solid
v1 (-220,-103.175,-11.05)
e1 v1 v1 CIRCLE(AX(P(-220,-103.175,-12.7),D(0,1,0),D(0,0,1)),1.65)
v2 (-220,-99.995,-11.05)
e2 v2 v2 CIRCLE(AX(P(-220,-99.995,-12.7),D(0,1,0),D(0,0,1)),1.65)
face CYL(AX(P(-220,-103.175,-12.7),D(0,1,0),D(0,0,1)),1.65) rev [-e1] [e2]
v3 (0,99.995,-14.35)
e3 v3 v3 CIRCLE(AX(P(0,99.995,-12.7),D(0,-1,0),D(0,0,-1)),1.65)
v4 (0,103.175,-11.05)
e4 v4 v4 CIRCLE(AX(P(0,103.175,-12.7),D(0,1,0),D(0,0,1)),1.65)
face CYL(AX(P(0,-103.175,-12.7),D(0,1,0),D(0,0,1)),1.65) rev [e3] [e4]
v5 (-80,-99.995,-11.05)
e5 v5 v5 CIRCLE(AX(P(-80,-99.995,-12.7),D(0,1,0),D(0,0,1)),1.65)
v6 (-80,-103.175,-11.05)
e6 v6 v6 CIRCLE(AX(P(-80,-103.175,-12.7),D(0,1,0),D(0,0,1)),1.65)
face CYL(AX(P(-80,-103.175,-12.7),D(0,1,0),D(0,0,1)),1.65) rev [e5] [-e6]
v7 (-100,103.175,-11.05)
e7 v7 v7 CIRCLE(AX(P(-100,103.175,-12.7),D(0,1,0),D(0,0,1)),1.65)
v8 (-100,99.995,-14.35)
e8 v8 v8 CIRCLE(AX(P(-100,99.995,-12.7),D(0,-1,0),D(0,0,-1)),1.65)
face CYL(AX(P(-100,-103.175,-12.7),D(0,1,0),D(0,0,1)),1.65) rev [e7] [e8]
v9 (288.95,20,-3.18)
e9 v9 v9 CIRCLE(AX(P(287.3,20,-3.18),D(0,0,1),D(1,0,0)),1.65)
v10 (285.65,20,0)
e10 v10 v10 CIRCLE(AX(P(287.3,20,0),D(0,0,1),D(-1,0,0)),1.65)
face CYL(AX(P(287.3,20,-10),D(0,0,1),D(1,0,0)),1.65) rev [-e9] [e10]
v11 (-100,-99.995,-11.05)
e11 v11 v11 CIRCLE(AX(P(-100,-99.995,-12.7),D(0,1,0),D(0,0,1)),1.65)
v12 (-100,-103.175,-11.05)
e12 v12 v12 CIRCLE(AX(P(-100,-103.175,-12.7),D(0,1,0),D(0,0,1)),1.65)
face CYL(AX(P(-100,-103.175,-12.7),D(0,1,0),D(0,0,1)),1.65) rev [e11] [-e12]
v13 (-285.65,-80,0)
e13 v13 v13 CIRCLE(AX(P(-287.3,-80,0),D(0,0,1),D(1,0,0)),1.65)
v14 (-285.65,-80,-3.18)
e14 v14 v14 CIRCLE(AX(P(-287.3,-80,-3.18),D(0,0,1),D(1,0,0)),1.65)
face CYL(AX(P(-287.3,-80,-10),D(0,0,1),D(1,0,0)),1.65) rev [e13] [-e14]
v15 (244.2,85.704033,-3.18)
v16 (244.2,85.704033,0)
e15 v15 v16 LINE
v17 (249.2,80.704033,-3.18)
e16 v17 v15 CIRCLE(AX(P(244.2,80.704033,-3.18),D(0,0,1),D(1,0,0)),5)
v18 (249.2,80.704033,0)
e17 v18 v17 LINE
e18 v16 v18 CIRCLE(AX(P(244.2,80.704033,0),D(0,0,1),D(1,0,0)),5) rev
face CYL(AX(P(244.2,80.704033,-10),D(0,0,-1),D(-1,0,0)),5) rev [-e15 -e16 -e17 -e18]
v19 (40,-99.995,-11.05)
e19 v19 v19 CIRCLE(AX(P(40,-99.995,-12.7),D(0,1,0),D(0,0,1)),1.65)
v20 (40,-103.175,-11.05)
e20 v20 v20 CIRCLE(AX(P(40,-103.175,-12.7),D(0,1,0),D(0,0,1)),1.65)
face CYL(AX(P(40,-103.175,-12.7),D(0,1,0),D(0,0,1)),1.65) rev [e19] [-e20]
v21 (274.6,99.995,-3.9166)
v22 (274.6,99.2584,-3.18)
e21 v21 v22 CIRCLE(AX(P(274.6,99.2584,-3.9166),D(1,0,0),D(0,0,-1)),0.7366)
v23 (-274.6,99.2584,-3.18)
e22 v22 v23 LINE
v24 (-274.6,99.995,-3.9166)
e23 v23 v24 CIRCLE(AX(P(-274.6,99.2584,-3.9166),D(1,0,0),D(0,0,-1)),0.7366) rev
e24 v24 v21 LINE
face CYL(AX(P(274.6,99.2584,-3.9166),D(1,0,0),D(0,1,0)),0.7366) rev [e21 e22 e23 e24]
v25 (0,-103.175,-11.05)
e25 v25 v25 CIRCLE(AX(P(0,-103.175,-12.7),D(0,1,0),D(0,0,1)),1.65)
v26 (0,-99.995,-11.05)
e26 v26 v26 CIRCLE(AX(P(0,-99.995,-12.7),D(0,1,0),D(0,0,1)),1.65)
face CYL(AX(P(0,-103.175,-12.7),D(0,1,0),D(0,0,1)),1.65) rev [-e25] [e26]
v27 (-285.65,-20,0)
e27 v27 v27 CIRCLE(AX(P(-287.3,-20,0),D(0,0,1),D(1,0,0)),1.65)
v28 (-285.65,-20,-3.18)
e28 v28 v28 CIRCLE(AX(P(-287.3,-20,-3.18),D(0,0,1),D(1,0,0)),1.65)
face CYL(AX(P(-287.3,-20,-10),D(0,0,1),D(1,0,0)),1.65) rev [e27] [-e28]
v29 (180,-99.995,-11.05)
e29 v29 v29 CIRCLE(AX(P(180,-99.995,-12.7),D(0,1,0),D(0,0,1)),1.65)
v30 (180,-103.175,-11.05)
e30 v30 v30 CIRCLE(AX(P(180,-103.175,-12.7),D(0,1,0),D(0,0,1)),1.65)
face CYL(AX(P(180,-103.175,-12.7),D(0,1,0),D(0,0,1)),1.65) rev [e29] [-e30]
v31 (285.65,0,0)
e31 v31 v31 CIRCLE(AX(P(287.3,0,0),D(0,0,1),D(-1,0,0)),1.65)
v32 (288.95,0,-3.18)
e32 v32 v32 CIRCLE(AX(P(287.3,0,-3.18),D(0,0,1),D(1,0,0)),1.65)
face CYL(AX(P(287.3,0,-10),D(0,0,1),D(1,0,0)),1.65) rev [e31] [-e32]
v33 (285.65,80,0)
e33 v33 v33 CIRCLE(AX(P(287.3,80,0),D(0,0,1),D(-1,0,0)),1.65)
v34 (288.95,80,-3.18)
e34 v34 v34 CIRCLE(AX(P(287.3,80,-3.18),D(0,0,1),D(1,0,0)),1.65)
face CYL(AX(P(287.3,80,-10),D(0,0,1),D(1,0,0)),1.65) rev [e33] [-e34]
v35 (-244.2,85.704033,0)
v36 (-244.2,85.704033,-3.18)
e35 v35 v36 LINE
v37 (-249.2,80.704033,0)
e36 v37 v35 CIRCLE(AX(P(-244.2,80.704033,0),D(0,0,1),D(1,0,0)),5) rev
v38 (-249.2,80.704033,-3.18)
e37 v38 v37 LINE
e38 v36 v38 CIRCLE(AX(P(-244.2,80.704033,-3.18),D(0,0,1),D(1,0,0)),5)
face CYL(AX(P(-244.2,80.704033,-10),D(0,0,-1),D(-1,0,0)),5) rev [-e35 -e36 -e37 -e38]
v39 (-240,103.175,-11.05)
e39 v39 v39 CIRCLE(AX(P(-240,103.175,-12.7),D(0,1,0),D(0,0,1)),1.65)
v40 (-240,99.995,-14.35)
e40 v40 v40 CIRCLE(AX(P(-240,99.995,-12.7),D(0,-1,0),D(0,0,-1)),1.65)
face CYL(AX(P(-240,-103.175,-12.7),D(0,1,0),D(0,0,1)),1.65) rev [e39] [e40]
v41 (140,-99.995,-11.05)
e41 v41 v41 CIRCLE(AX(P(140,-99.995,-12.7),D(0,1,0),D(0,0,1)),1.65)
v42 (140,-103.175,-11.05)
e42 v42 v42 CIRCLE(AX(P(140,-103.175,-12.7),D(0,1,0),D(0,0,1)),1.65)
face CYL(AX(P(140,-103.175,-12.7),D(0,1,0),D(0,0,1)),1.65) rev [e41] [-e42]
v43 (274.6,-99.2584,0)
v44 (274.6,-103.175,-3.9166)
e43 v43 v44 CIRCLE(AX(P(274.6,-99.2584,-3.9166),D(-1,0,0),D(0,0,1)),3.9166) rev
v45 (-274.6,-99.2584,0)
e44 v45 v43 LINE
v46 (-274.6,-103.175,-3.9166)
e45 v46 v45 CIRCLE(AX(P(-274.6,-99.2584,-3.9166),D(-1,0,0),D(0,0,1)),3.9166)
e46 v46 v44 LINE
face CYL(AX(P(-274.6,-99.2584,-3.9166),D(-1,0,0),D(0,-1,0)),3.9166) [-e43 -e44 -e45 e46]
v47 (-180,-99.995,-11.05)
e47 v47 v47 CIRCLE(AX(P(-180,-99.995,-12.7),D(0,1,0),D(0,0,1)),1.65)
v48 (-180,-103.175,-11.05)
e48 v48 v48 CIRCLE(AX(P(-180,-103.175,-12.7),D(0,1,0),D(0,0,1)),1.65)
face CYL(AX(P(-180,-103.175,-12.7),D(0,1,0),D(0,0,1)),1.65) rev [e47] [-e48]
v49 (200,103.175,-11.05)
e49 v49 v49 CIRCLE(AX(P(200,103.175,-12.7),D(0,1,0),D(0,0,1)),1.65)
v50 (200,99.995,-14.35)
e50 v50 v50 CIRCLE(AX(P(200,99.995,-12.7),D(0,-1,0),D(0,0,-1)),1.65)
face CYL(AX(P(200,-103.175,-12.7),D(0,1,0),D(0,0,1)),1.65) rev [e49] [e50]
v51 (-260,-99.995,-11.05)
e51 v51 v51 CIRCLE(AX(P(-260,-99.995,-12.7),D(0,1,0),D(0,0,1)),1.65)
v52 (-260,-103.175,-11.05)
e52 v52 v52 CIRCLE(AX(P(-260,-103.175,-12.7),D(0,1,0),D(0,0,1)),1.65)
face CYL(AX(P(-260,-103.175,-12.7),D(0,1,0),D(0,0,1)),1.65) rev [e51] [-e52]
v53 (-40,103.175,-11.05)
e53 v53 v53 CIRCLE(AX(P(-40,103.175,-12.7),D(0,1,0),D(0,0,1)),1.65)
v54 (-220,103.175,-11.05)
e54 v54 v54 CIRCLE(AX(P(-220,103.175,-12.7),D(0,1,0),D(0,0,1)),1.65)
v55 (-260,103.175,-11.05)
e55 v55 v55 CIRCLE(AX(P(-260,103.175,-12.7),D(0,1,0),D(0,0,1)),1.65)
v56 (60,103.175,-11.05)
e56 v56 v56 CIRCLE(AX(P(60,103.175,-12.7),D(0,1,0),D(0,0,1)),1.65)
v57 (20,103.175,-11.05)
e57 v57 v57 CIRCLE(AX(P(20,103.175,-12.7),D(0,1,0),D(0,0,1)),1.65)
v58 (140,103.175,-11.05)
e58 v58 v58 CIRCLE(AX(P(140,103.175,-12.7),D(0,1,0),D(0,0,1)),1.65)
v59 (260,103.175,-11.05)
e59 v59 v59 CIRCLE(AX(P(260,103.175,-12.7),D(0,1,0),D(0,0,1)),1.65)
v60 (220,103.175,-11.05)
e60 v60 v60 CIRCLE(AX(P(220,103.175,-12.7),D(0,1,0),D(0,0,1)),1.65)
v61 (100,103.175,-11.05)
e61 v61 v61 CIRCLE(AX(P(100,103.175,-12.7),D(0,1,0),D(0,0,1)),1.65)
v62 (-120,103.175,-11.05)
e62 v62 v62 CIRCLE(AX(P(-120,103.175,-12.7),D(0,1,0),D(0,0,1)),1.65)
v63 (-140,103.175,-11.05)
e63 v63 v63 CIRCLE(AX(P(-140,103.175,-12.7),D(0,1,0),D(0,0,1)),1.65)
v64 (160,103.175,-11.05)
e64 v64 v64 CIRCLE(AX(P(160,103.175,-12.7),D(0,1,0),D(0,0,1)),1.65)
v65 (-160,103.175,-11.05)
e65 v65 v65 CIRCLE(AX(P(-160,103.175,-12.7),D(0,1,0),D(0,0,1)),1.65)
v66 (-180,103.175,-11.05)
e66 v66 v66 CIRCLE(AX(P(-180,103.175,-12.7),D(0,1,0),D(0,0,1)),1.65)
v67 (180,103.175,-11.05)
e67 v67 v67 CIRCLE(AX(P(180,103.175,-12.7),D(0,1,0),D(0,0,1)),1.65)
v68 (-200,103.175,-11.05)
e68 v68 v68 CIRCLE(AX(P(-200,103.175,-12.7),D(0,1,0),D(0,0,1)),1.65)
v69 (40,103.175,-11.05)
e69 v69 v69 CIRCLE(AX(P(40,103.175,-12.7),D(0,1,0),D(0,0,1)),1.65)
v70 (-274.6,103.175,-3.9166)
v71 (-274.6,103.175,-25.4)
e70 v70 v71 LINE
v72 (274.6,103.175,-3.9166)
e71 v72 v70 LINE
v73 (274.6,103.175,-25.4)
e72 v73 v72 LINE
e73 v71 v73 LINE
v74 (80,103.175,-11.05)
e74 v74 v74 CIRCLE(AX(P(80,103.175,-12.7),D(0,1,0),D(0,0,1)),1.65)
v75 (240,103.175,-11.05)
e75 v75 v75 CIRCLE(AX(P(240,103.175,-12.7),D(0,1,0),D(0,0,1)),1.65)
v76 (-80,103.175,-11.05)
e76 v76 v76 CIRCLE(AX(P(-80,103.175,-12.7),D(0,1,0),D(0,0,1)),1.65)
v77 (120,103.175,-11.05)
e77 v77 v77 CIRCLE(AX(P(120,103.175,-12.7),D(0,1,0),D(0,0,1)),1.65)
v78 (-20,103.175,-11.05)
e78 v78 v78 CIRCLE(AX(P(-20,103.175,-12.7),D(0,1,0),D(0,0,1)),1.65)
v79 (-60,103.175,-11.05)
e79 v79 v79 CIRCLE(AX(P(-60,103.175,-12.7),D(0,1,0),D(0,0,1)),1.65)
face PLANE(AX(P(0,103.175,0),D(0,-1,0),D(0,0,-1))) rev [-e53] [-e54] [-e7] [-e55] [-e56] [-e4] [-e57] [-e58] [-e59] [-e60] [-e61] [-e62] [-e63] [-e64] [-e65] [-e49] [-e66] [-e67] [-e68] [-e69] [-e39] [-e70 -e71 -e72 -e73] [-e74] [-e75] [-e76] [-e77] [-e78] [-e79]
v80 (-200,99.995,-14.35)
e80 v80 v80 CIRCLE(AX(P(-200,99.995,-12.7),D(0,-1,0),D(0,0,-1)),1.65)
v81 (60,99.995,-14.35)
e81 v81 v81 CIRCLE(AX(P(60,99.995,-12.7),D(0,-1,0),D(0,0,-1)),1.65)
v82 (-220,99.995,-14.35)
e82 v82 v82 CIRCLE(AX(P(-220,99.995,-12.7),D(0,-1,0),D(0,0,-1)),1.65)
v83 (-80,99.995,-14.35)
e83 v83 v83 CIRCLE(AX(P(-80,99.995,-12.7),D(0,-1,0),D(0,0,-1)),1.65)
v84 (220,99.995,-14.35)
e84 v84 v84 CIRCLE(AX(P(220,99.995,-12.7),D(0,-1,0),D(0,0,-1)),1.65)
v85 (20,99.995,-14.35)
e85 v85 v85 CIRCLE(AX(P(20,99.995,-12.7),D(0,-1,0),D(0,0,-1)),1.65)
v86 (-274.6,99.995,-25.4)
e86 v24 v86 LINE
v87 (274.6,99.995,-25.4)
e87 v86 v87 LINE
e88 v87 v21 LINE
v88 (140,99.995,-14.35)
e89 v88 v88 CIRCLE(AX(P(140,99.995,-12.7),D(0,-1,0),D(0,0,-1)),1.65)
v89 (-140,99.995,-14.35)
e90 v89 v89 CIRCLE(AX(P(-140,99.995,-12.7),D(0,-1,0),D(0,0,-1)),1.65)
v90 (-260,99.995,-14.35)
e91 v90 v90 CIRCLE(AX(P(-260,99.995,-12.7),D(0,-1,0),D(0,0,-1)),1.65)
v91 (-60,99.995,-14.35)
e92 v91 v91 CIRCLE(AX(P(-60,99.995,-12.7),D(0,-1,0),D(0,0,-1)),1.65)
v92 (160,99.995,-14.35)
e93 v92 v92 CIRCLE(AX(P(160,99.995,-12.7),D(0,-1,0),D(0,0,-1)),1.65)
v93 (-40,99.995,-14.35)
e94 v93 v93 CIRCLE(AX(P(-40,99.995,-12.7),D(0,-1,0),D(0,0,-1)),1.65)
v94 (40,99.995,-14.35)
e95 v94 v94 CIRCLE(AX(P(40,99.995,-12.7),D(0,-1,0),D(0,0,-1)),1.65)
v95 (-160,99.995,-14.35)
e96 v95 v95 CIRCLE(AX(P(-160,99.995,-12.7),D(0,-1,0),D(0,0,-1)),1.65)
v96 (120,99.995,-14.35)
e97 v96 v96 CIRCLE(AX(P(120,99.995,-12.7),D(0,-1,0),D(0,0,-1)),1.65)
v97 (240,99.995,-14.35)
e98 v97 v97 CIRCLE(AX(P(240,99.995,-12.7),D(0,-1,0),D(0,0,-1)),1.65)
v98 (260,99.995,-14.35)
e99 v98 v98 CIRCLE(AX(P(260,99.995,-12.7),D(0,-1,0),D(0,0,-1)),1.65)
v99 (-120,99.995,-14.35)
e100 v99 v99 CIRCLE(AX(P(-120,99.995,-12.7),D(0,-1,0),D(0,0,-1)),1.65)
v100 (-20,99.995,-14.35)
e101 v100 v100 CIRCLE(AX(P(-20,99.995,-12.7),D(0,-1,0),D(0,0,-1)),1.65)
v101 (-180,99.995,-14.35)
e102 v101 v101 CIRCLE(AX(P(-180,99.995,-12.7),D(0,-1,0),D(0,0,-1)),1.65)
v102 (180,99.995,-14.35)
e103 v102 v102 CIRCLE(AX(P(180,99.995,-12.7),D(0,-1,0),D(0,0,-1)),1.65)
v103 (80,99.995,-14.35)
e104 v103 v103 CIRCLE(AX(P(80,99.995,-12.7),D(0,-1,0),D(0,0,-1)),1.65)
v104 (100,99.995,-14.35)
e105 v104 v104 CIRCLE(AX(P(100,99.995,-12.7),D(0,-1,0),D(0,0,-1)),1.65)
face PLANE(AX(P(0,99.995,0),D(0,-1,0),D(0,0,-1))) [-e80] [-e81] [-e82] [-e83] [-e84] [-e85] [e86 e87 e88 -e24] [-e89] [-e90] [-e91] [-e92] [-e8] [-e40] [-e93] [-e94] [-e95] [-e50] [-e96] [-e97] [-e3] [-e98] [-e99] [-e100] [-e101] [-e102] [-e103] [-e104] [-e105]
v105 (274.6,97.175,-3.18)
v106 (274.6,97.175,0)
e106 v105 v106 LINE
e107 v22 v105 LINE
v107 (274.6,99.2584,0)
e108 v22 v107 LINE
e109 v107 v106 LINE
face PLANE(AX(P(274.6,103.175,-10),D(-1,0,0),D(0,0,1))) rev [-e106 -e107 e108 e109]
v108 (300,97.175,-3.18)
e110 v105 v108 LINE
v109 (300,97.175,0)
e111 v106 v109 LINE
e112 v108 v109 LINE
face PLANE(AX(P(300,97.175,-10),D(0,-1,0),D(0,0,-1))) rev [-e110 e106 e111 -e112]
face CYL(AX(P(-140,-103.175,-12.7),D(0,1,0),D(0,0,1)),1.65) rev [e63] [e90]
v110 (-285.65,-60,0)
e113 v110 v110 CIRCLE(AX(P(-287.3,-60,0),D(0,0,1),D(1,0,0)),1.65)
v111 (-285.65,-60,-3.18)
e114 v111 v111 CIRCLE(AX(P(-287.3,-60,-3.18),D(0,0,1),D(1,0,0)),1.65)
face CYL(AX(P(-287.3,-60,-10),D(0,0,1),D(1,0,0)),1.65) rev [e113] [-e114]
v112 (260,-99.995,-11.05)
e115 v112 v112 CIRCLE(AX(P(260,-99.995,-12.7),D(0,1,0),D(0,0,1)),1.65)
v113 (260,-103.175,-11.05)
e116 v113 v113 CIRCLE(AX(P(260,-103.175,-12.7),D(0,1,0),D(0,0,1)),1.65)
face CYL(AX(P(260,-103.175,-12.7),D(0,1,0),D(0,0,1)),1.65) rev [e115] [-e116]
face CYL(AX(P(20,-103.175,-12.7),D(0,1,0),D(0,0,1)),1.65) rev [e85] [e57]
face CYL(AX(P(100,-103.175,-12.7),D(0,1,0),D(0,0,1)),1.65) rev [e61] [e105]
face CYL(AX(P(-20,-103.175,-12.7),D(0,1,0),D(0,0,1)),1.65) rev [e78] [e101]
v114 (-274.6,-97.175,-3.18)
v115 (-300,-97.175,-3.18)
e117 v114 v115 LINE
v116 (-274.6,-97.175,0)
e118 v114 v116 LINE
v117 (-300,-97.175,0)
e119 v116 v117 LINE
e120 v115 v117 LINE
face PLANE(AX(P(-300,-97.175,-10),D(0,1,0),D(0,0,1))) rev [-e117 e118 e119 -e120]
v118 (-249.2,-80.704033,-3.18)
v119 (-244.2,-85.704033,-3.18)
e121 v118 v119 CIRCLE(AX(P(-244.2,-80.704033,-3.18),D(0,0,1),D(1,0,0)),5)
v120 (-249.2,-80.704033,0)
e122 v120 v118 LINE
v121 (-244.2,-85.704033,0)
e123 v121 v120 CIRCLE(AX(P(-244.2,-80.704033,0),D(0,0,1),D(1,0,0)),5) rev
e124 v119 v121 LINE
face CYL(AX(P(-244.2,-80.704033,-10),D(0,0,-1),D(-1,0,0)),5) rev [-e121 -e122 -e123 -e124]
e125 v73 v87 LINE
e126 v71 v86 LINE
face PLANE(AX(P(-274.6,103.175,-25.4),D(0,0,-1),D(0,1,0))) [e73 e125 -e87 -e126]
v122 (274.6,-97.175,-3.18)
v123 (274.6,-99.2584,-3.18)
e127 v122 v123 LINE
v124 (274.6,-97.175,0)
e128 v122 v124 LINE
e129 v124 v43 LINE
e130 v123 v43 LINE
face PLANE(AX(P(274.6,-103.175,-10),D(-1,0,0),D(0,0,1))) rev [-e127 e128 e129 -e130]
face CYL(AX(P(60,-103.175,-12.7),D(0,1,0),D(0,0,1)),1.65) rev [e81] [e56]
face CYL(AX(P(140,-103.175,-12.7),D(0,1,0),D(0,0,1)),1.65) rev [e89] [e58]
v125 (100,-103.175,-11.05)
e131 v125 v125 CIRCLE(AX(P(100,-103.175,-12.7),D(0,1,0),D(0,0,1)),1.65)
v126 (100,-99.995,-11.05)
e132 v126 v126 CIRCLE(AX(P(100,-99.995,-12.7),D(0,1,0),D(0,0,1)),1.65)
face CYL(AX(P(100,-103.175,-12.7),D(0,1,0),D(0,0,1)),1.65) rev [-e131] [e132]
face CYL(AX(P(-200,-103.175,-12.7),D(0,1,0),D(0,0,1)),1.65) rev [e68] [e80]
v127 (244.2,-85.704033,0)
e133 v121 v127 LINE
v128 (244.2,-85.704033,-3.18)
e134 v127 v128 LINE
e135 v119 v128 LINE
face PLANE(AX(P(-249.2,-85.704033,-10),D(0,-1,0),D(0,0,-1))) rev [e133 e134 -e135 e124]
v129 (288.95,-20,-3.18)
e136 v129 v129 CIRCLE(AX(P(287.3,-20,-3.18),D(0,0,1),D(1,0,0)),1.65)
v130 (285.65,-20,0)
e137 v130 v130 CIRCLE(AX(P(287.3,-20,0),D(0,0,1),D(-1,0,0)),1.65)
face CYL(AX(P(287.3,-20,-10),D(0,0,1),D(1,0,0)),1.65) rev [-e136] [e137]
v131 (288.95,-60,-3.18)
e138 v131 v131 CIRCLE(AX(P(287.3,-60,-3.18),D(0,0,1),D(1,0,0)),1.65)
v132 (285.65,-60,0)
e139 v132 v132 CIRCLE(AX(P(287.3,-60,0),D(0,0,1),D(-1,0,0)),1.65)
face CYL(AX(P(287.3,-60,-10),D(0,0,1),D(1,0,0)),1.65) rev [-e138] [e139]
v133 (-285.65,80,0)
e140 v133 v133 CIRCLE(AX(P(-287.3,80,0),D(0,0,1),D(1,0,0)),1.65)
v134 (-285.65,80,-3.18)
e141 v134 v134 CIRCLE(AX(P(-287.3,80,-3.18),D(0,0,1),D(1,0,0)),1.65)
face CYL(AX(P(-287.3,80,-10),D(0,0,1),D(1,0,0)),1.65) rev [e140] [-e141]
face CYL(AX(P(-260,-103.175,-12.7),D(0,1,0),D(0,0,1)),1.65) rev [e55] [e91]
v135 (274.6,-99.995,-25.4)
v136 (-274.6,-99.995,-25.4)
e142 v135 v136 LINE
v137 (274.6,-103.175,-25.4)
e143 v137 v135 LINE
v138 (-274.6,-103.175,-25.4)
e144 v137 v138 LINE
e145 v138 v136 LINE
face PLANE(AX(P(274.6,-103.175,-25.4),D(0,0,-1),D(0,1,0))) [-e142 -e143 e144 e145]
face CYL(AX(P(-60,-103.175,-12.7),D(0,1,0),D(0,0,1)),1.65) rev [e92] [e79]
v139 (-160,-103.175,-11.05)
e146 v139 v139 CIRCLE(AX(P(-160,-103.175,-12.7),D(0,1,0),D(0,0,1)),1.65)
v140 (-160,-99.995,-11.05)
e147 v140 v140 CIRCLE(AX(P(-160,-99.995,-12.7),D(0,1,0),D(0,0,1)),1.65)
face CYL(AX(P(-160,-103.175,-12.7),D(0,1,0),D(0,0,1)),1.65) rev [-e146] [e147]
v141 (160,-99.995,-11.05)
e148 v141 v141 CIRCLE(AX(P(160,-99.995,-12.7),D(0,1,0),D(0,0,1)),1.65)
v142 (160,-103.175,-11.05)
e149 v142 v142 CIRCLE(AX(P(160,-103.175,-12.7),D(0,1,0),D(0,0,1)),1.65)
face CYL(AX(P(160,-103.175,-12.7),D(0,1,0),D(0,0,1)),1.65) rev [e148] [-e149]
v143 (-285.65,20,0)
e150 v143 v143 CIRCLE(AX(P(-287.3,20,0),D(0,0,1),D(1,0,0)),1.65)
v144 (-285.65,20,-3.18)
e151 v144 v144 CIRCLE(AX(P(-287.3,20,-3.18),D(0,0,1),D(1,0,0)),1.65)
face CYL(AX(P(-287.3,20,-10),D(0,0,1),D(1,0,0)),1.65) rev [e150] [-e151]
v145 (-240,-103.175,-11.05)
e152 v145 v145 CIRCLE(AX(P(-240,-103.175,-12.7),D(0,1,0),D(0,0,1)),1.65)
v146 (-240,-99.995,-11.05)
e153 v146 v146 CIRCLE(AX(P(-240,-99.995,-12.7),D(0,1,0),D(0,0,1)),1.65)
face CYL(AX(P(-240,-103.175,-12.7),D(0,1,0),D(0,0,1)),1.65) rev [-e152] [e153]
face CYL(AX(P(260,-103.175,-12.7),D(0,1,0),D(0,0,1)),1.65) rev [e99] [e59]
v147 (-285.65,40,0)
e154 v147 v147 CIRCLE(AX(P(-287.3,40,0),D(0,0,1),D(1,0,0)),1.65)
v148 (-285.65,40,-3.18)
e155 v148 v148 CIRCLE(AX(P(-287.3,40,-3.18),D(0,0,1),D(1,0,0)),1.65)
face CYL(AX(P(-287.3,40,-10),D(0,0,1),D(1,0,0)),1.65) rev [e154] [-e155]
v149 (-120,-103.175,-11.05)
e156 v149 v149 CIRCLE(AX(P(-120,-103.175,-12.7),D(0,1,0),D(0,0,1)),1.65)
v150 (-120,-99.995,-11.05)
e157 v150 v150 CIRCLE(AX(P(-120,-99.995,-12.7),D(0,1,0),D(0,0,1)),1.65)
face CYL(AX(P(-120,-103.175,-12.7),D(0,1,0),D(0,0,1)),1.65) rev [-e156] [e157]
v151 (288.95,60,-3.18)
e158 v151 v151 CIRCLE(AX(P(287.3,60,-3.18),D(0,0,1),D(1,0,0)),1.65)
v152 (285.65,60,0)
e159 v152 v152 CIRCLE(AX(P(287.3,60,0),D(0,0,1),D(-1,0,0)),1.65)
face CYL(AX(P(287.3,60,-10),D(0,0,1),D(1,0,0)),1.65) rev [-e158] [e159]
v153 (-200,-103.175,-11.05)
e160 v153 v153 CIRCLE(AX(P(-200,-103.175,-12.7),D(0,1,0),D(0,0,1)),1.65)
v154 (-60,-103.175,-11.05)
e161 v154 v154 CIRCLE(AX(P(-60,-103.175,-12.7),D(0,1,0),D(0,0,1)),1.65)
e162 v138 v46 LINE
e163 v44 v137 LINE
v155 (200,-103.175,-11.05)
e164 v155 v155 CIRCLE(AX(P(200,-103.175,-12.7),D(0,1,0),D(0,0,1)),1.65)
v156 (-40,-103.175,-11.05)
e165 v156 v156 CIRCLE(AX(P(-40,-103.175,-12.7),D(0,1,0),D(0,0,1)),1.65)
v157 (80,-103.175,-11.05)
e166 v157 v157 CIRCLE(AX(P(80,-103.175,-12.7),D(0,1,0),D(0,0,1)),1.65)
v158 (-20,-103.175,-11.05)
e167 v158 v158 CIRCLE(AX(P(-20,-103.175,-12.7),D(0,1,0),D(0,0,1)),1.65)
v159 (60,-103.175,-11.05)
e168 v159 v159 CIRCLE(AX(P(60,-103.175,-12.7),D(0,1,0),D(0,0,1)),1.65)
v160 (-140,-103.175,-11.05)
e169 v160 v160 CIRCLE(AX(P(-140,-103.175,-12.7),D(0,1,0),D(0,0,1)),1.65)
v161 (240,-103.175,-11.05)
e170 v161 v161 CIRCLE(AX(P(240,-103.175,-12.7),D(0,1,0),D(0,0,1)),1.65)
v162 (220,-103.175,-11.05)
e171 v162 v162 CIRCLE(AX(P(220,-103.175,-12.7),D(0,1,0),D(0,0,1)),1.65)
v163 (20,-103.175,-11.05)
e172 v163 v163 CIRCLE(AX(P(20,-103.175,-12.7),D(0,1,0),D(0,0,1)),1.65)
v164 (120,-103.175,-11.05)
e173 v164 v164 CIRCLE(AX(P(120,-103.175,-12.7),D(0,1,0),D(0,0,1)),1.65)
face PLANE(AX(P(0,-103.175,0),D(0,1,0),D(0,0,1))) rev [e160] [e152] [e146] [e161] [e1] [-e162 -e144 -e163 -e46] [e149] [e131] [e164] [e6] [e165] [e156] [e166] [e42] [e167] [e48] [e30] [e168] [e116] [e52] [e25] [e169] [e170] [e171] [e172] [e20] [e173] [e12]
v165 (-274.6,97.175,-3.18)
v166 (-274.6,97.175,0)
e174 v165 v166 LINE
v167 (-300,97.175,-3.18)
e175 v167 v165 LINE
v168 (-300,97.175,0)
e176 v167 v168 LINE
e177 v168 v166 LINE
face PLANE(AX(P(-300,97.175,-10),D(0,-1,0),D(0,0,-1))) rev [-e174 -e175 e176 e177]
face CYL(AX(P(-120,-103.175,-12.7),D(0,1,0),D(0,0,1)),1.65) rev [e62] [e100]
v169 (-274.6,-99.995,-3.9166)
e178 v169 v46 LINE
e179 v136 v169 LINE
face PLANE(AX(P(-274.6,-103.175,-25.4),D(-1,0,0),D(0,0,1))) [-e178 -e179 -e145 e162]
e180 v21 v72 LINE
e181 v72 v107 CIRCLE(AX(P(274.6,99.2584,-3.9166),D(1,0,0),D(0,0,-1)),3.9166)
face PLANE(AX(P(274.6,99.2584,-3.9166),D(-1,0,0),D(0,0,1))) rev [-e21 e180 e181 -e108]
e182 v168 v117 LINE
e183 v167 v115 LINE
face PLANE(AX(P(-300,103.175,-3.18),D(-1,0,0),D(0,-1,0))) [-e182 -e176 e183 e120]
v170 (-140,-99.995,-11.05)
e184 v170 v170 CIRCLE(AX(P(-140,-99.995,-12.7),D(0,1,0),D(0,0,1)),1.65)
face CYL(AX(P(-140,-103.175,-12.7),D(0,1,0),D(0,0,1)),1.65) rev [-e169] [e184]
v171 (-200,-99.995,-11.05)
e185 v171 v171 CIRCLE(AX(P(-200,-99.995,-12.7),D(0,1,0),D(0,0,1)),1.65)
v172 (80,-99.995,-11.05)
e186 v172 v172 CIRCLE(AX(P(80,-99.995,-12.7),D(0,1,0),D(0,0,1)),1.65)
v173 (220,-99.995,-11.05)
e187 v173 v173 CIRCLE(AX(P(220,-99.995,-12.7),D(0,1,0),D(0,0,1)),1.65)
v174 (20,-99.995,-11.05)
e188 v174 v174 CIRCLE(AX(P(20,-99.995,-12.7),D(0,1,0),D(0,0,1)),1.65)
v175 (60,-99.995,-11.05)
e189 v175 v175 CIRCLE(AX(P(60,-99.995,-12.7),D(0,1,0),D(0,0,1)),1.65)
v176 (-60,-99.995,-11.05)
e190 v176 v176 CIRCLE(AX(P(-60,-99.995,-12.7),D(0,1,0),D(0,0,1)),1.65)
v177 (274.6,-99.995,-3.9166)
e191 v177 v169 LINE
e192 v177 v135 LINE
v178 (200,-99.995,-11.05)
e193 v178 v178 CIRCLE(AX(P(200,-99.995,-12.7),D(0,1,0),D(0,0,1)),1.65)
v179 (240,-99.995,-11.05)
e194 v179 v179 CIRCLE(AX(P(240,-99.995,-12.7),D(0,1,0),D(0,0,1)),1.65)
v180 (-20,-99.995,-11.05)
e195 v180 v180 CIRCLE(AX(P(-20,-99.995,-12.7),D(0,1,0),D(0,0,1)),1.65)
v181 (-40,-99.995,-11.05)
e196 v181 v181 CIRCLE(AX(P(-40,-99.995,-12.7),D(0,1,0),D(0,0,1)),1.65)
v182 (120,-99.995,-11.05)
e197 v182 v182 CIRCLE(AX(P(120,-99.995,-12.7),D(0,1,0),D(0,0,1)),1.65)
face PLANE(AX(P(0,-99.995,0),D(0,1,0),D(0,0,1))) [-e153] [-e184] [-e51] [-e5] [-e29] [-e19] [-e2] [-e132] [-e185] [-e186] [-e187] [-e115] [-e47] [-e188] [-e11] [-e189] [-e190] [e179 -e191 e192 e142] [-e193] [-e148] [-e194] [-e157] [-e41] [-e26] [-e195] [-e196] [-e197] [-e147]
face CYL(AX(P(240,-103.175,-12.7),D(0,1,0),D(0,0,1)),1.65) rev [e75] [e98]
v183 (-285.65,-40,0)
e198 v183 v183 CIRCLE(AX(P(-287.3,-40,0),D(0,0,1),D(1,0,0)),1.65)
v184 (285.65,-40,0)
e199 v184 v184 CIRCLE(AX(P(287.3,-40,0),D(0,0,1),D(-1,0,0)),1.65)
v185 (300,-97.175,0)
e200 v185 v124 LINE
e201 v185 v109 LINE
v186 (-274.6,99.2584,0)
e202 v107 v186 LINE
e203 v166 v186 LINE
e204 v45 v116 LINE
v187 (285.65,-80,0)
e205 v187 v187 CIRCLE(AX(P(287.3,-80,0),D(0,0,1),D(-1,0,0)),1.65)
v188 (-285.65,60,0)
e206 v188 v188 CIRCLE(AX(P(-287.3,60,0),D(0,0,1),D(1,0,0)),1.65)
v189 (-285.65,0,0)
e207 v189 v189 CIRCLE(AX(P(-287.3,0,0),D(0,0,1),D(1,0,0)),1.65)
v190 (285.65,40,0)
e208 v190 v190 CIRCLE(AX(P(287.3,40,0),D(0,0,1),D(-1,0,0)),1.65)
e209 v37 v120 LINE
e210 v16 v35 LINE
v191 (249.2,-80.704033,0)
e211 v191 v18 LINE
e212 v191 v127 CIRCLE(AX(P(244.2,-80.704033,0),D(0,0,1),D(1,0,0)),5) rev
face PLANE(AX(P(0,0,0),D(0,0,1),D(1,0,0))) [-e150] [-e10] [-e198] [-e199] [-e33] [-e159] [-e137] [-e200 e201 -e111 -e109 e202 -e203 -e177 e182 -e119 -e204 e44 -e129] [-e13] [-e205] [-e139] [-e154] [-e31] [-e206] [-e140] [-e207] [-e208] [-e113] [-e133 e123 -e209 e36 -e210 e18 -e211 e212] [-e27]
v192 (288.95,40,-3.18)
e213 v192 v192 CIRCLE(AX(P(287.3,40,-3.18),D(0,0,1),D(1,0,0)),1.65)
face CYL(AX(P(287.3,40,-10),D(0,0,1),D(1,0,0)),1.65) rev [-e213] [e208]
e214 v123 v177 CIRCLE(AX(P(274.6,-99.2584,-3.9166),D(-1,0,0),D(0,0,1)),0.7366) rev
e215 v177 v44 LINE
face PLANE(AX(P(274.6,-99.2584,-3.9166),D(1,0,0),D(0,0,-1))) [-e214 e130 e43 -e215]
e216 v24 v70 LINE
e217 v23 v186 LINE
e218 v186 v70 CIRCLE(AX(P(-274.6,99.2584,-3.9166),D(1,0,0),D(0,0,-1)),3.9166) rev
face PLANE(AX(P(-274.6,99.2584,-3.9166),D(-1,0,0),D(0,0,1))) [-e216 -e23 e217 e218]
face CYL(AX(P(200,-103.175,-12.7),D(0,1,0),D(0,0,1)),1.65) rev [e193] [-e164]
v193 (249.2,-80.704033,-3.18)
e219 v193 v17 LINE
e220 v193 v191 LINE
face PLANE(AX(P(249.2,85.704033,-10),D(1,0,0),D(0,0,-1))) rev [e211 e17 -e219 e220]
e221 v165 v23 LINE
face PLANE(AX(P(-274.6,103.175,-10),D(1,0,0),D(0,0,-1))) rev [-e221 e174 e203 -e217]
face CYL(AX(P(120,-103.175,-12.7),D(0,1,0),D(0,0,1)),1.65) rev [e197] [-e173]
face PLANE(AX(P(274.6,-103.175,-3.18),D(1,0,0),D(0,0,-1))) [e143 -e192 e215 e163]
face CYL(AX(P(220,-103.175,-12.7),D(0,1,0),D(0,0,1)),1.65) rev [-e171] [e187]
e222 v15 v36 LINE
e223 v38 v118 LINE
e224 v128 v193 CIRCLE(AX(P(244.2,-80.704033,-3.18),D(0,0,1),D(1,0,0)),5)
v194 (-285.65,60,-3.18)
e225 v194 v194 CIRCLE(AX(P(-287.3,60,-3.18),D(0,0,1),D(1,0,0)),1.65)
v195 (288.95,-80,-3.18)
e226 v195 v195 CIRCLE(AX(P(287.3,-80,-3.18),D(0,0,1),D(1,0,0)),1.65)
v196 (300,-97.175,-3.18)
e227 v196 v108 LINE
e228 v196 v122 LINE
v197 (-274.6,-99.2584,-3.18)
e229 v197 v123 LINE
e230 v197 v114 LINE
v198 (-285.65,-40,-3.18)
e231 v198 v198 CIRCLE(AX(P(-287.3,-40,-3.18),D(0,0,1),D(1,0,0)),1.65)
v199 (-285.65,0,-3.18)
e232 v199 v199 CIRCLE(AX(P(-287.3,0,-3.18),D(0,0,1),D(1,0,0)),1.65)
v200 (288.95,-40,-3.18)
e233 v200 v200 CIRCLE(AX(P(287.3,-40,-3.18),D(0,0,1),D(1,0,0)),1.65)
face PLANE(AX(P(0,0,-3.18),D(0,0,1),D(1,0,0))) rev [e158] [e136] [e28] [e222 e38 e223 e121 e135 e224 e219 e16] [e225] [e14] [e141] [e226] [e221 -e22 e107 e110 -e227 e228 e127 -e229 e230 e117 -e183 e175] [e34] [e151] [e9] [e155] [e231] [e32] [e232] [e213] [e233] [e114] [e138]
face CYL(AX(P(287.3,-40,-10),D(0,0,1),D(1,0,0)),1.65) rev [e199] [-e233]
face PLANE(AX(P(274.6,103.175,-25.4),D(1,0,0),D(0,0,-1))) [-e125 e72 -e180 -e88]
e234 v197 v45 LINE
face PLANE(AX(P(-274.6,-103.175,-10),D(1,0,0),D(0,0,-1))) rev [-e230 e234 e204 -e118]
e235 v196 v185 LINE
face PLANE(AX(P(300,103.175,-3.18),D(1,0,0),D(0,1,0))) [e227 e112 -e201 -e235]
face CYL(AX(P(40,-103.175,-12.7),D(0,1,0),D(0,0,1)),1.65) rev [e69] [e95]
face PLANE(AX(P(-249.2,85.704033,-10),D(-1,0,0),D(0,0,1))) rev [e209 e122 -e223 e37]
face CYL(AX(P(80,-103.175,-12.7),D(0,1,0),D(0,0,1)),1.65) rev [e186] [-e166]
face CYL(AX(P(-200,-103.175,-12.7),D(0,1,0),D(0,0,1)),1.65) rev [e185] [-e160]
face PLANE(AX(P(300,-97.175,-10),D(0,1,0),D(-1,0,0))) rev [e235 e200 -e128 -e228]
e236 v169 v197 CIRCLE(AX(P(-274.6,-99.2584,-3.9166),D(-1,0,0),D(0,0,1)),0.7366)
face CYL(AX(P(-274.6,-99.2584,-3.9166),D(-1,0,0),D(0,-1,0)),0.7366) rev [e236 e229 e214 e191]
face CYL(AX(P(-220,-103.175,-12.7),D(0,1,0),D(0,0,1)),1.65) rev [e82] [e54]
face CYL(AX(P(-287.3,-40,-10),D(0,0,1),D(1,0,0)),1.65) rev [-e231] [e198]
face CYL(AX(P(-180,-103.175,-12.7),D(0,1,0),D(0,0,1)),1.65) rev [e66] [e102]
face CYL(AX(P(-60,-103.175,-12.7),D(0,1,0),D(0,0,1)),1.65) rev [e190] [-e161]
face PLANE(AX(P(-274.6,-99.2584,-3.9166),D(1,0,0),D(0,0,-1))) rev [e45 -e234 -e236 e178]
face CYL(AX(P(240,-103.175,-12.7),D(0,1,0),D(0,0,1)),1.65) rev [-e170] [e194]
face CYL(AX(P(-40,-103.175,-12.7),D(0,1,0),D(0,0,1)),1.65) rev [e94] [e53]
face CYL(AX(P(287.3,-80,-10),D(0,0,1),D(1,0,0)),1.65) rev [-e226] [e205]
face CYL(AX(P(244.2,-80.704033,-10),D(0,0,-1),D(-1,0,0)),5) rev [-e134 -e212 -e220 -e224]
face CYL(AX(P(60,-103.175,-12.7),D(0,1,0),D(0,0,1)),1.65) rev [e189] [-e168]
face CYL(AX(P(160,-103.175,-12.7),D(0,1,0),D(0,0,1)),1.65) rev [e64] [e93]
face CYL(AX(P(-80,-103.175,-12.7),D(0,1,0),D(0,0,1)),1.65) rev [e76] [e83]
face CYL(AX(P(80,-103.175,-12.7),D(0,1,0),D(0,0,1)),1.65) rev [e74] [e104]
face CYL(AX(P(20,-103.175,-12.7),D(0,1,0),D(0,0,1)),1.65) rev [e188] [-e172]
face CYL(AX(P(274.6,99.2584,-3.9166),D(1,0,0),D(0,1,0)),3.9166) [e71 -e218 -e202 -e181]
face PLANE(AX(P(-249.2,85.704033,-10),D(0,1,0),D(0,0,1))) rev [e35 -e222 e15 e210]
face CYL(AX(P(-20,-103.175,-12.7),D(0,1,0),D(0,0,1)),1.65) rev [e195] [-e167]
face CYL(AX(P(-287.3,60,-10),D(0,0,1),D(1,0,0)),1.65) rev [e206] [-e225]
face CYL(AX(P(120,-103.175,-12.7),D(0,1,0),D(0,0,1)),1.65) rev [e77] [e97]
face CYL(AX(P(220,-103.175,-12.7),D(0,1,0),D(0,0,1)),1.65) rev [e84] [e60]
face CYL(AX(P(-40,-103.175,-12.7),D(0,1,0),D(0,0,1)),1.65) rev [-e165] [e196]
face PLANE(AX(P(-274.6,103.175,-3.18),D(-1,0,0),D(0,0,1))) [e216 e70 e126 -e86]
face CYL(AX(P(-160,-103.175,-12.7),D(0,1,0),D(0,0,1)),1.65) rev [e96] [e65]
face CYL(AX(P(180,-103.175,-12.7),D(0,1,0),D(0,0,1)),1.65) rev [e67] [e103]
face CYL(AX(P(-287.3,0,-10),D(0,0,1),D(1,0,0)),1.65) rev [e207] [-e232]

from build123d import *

# Parameters (mm, degrees)
SKETCH1_W                      = 600
SKETCH1_H                      = 206.35
BASE_FLANGE1_DEPTH             = 3.18
SKETCH6_W                      = 25.4
SKETCH6_H                      = 6
CUT_EXTRUDE1_DEPTH             = 10
EDGE_FLANGE1_STRIP_W           = 14.1932
EDGE_FLANGE1_STRIP_H           = 3.18
EDGE_FLANGE1_STRIP_CUT_DEPTH   = 549.2
EDGE_FLANGE1_STRIP_2_W         = 14.1932
EDGE_FLANGE1_STRIP_2_H         = 3.18
EDGE_FLANGE1_STRIP_CUT_2_DEPTH = 549.2
EDGE_FLANGE1_DEPTH             = 549.2
EDGE_FLANGE1_BEND_DEPTH        = 549.2
SKETCH15_W                     = 498.4
SKETCH15_H                     = 171.408066666
CUT_EXTRUDE2_DEPTH             = 10
FILLET1_R                      = 5
SKETCH16_R                     = 1.65
CUT_EXTRUDE3_DEPTH             = 10
SKETCH17_R                     = 1.65
CUT_EXTRUDE4_DEPTH             = 366.000660958


# Sheet-metal steps are written as plain solids
with BuildPart() as part:
    # Sketch1 → Base-Flange1 (new body)
    with BuildSketch(Plane.XY):
        Rectangle(SKETCH1_W, SKETCH1_H)
    extrude(amount=-BASE_FLANGE1_DEPTH)

    # Sketch6 → Cut-Extrude1 (cut)
    with BuildSketch(Plane.XY):
        with Locations((-287.3, 100.175)):
            Rectangle(SKETCH6_W, SKETCH6_H)
        with Locations((-287.3, -100.175)):
            Rectangle(SKETCH6_W, SKETCH6_H)
        with Locations((287.3, -100.175)):
            Rectangle(SKETCH6_W, SKETCH6_H)
        with Locations((287.3, 100.175)):
            Rectangle(SKETCH6_W, SKETCH6_H)
    extrude(amount=-CUT_EXTRUDE1_DEPTH, mode=Mode.SUBTRACT)

    # Edge-Flange1 strip (across the edge) → Edge-Flange1 strip cut (cut)
    with BuildSketch(Plane(origin=(-274.6, 103.175, -3.18), x_dir=(0, -1, 0), z_dir=(1, 0, 0))):
        with Locations((-3.18, -1.59)):
            Rectangle(EDGE_FLANGE1_STRIP_W, EDGE_FLANGE1_STRIP_H)
    extrude(amount=EDGE_FLANGE1_STRIP_CUT_DEPTH, mode=Mode.SUBTRACT)

    # Edge-Flange1 strip 2 (across the edge) → Edge-Flange1 strip cut 2 (cut)
    with BuildSketch(Plane(origin=(274.6, -103.175, -3.18), x_dir=(0, 1, 0), z_dir=(-1, 0, 0))):
        with Locations((-3.18, -1.59)):
            Rectangle(EDGE_FLANGE1_STRIP_2_W, EDGE_FLANGE1_STRIP_2_H)
    extrude(amount=EDGE_FLANGE1_STRIP_CUT_2_DEPTH, mode=Mode.SUBTRACT)

    # Edge-Flange1 section (across the edge) → Edge-Flange1 (add)
    with BuildSketch(Plane(origin=(-274.6, 103.175, -3.18), x_dir=(0, -1, 0), z_dir=(1, 0, 0))):
        with BuildLine():
            Line((0, 0.7366), (0, 22.22))
            Line((0, 22.22), (3.18, 22.22))
            Line((3.18, 22.22), (3.18, 0.7366))
            ThreePointArc((3.18, 0.7366), (3.395745145, 0.215745145), (3.9166, 0))
            Line((3.9166, 0), (3.9166, -3.18))
            ThreePointArc((3.9166, -3.18), (1.147145581, -2.032854419), (0, 0.7366))
        make_face()
    extrude(amount=EDGE_FLANGE1_DEPTH)

    # Edge-Flange1 section 2 (across the edge) → Edge-Flange1 bend (add)
    with BuildSketch(Plane(origin=(274.6, -103.175, -3.18), x_dir=(0, 1, 0), z_dir=(-1, 0, 0))):
        with BuildLine():
            Line((0, 0.7366), (0, 22.22))
            Line((0, 22.22), (3.18, 22.22))
            Line((3.18, 22.22), (3.18, 0.7366))
            ThreePointArc((3.18, 0.7366), (3.395745145, 0.215745145), (3.9166, 0))
            Line((3.9166, 0), (3.9166, -3.18))
            ThreePointArc((3.9166, -3.18), (1.147145581, -2.032854419), (0, 0.7366))
        make_face()
    extrude(amount=EDGE_FLANGE1_BEND_DEPTH)

    # Sketch15 → Cut-Extrude2 (cut)
    with BuildSketch(Plane.XY):
        Rectangle(SKETCH15_W, SKETCH15_H)
    extrude(amount=-CUT_EXTRUDE2_DEPTH, mode=Mode.SUBTRACT)

    # Fillet1
    fillet1_edges = [part.edges().sort_by_distance(p)[0] for p in [
        (249.2, 85.704033333, -1.59),
        (249.2, -85.704033333, -1.59),
        (-249.2, -85.704033333, -1.59),
        (-249.2, 85.704033333, -1.59),
    ]]
    fillet(fillet1_edges, radius=FILLET1_R)

    # Sketch16 → Cut-Extrude3 (cut)
    with BuildSketch(Plane.XY):
        with Locations((-287.3, 0)):
            Circle(SKETCH16_R)
        with Locations((-287.3, 20)):
            Circle(SKETCH16_R)
        with Locations((-287.3, 40)):
            Circle(SKETCH16_R)
        with Locations((-287.3, 60)):
            Circle(SKETCH16_R)
        with Locations((-287.3, -20)):
            Circle(SKETCH16_R)
        with Locations((-287.3, -40)):
            Circle(SKETCH16_R)
        with Locations((-287.3, -60)):
            Circle(SKETCH16_R)
        with Locations((287.3, -60)):
            Circle(SKETCH16_R)
        with Locations((287.3, -40)):
            Circle(SKETCH16_R)
        with Locations((287.3, -20)):
            Circle(SKETCH16_R)
        with Locations((287.3, 0)):
            Circle(SKETCH16_R)
        with Locations((287.3, 20)):
            Circle(SKETCH16_R)
        with Locations((287.3, 40)):
            Circle(SKETCH16_R)
        with Locations((287.3, 60)):
            Circle(SKETCH16_R)
        with Locations((-287.3, 80)):
            Circle(SKETCH16_R)
        with Locations((-287.3, -80)):
            Circle(SKETCH16_R)
        with Locations((287.3, -80)):
            Circle(SKETCH16_R)
        with Locations((287.3, 80)):
            Circle(SKETCH16_R)
    extrude(amount=-CUT_EXTRUDE3_DEPTH, mode=Mode.SUBTRACT)

    # Sketch17 → Cut-Extrude4 (cut, through all)
    with BuildSketch(Plane(origin=(0, 103.175, 0), x_dir=(1, 0, 0), z_dir=(0, 1, 0))):
        with Locations(Location((0, 12.7, 0), (0, 0, 270))):
            Circle(SKETCH17_R)
        with Locations(Location((20, 12.7, 0), (0, 0, 270))):
            Circle(SKETCH17_R)
        with Locations(Location((40, 12.7, 0), (0, 0, 270))):
            Circle(SKETCH17_R)
        with Locations(Location((60, 12.7, 0), (0, 0, 270))):
            Circle(SKETCH17_R)
        with Locations(Location((80, 12.7, 0), (0, 0, 270))):
            Circle(SKETCH17_R)
        with Locations(Location((100, 12.7, 0), (0, 0, 270))):
            Circle(SKETCH17_R)
        with Locations(Location((120, 12.7, 0), (0, 0, 270))):
            Circle(SKETCH17_R)
        with Locations(Location((140, 12.7, 0), (0, 0, 270))):
            Circle(SKETCH17_R)
        with Locations(Location((160, 12.7, 0), (0, 0, 270))):
            Circle(SKETCH17_R)
        with Locations(Location((180, 12.7, 0), (0, 0, 270))):
            Circle(SKETCH17_R)
        with Locations(Location((200, 12.7, 0), (0, 0, 270))):
            Circle(SKETCH17_R)
        with Locations(Location((220, 12.7, 0), (0, 0, 270))):
            Circle(SKETCH17_R)
        with Locations(Location((240, 12.7, 0), (0, 0, 270))):
            Circle(SKETCH17_R)
        with Locations(Location((260, 12.7, 0), (0, 0, 270))):
            Circle(SKETCH17_R)
        with Locations(Location((-20, 12.7, 0), (0, 0, 270))):
            Circle(SKETCH17_R)
        with Locations(Location((-40, 12.7, 0), (0, 0, 270))):
            Circle(SKETCH17_R)
        with Locations(Location((-60, 12.7, 0), (0, 0, 270))):
            Circle(SKETCH17_R)
        with Locations(Location((-80, 12.7, 0), (0, 0, 270))):
            Circle(SKETCH17_R)
        with Locations(Location((-100, 12.7, 0), (0, 0, 270))):
            Circle(SKETCH17_R)
        with Locations(Location((-120, 12.7, 0), (0, 0, 270))):
            Circle(SKETCH17_R)
        with Locations(Location((-140, 12.7, 0), (0, 0, 270))):
            Circle(SKETCH17_R)
        with Locations(Location((-160, 12.7, 0), (0, 0, 270))):
            Circle(SKETCH17_R)
        with Locations(Location((-180, 12.7, 0), (0, 0, 270))):
            Circle(SKETCH17_R)
        with Locations(Location((-200, 12.7, 0), (0, 0, 270))):
            Circle(SKETCH17_R)
        with Locations(Location((-220, 12.7, 0), (0, 0, 270))):
            Circle(SKETCH17_R)
        with Locations(Location((-240, 12.7, 0), (0, 0, 270))):
            Circle(SKETCH17_R)
        with Locations(Location((-260, 12.7, 0), (0, 0, 270))):
            Circle(SKETCH17_R)
    extrude(amount=-CUT_EXTRUDE4_DEPTH, mode=Mode.SUBTRACT)


solid = part.part
